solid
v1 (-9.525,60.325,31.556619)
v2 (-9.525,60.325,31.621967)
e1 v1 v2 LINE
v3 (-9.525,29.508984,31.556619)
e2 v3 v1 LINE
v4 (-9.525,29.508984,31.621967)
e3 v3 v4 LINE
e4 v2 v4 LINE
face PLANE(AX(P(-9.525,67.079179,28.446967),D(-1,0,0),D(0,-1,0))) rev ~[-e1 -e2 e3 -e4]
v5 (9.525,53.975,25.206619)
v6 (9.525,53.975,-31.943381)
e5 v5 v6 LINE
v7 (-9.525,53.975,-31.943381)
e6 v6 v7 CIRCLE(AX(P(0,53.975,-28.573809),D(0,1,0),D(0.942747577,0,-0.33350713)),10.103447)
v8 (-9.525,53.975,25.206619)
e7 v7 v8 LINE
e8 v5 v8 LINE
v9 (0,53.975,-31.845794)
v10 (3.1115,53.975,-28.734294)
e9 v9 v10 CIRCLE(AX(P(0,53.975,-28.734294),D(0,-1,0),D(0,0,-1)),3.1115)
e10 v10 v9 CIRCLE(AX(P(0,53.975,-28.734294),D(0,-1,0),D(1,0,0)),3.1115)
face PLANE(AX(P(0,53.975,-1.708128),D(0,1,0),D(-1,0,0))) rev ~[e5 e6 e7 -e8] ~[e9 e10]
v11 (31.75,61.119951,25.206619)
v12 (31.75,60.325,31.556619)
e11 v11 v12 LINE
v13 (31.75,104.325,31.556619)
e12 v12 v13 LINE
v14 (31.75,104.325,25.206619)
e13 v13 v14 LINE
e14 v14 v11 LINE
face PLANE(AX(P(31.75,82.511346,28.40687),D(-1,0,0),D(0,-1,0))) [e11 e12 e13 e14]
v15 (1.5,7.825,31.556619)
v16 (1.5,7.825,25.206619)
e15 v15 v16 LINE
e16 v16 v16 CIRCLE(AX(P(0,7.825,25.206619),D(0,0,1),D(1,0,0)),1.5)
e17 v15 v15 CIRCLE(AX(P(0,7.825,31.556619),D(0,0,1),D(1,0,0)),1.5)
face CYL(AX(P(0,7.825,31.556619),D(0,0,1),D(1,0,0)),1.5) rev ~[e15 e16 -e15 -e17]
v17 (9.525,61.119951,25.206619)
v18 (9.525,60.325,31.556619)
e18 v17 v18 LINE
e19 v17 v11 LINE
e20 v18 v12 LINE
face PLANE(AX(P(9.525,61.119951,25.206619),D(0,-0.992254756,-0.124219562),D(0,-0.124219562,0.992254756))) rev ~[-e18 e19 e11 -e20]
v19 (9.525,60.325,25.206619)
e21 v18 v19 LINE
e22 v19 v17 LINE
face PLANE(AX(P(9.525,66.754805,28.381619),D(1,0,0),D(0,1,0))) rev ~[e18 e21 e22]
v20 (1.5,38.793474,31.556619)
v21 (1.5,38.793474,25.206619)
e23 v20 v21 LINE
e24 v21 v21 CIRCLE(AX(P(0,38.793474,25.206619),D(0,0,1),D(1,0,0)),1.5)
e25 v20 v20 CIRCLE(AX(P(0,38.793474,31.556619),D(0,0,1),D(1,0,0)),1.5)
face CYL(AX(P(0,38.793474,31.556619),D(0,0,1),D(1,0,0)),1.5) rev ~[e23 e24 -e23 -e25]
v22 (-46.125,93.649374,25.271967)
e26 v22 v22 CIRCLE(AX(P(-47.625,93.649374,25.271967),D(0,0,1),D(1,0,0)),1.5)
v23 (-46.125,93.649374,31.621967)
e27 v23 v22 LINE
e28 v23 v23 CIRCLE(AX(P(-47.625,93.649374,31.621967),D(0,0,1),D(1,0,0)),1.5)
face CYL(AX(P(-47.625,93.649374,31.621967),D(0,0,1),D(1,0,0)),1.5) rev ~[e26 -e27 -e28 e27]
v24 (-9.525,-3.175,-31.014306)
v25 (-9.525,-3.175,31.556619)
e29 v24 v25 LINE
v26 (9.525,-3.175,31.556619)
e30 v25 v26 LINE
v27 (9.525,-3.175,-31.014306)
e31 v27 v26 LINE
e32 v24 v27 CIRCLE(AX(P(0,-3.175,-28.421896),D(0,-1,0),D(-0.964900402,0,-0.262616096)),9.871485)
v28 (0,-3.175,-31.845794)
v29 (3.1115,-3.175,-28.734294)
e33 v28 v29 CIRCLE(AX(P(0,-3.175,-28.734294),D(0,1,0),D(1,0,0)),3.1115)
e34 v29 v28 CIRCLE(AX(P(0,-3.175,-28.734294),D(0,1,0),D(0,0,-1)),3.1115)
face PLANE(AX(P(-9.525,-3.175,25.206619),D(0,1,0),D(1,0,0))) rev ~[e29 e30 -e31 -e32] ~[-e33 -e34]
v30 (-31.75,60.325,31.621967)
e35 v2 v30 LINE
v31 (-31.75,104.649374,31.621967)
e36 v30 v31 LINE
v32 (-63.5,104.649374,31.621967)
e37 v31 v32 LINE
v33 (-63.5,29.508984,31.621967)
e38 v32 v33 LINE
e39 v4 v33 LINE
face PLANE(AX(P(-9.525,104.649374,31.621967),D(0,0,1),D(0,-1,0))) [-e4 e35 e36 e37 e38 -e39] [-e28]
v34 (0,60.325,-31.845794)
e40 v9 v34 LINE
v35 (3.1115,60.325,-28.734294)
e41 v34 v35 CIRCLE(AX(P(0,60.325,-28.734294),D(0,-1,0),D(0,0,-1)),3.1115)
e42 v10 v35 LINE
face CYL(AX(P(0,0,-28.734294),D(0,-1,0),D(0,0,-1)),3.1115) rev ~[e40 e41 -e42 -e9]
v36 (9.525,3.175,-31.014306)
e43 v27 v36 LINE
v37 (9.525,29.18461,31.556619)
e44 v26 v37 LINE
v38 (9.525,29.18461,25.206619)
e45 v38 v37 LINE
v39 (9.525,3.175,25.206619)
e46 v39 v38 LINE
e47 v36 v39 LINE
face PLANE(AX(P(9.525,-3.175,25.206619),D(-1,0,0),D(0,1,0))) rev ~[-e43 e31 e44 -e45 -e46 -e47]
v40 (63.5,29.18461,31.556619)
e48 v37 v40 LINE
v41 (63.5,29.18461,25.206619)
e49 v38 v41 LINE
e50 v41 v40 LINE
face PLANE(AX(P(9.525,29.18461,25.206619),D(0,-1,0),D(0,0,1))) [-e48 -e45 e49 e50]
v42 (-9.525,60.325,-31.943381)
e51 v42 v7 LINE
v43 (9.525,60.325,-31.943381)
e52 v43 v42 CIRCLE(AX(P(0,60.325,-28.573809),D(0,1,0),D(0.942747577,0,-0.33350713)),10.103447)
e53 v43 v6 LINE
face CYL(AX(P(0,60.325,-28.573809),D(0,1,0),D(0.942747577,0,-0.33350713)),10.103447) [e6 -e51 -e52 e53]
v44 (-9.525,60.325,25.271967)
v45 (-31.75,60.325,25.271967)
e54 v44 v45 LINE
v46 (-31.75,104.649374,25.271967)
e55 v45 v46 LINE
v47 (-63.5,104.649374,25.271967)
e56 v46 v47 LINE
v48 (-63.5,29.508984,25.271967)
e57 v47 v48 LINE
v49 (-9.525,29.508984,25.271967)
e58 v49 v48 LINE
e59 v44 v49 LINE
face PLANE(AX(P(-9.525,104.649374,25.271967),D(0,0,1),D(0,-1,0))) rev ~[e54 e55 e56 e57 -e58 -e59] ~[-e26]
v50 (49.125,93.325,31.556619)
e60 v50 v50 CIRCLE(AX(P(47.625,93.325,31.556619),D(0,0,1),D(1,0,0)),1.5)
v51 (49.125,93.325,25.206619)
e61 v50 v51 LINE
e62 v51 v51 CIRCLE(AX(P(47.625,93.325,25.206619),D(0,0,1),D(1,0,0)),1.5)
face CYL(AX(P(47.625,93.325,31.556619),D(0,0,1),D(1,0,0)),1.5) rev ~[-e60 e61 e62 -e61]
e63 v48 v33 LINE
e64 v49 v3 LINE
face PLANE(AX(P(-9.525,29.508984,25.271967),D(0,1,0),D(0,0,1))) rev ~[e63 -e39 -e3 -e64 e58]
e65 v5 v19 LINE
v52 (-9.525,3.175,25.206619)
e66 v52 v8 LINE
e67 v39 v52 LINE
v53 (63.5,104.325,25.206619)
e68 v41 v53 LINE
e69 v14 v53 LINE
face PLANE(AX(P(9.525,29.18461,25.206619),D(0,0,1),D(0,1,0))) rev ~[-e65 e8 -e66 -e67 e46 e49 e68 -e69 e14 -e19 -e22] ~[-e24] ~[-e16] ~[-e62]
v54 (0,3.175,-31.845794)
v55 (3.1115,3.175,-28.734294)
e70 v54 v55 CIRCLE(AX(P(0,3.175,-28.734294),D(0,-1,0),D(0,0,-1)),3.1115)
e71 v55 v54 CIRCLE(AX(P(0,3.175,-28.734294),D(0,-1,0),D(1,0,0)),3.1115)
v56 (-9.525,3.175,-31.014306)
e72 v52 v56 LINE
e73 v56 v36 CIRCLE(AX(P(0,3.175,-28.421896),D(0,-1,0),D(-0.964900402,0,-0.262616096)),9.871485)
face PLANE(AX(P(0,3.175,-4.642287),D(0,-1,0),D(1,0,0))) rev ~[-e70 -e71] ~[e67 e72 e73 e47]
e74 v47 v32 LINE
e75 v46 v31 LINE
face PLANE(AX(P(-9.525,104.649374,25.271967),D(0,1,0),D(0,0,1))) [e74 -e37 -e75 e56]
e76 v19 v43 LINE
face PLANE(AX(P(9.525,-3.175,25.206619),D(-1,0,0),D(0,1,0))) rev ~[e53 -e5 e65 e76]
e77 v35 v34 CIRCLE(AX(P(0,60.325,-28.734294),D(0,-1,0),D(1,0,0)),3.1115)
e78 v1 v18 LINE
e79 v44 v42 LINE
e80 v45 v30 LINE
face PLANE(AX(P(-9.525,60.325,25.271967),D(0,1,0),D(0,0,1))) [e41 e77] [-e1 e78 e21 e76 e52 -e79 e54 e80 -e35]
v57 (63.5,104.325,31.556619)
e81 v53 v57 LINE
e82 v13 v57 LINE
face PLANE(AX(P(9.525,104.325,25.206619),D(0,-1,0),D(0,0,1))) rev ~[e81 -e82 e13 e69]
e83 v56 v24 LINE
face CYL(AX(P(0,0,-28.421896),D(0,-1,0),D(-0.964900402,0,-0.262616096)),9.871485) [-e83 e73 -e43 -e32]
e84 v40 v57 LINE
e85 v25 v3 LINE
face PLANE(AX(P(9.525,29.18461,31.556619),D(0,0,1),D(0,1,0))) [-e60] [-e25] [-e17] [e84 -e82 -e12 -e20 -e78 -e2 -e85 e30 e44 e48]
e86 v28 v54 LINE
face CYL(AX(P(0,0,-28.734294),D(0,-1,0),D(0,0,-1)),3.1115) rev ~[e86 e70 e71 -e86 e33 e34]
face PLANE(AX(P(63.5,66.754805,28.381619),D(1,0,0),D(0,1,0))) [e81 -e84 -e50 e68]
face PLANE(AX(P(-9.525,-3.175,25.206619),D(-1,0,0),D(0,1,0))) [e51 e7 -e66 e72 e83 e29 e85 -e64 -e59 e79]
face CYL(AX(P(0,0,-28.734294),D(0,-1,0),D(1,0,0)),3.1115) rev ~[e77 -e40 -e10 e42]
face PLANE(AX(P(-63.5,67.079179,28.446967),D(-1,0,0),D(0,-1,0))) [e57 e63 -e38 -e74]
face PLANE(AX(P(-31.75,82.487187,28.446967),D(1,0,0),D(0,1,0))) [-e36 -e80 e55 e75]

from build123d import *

# Parameters (mm, degrees)
F1_DEPTH  = 3.175
F2_DEPTH  = 3.175
F4_DEPTH  = 25.4
F5_DEPTH  = 25.4
F6_W      = 19.05
F6_H      = 63.5
F7_DEPTH  = 6.35
F9_DEPTH  = 6.35
F10_DEPTH = 2540
F11_R     = 1.5
F12_DEPTH = 25.4
F13_W     = 75.1403903484
F13_H     = 6.35
F14_DEPTH = 53.975
F15_R     = 1.5
F16_DEPTH = 25
F17_W     = 75.1403903484
F17_H     = 6.35
F18_DEPTH = 53.975
F19_R     = 1.5
F20_DEPTH = 25
F22_DEPTH = 22.225
F23_W     = 44.3243741632
F23_H     = 6.35
F24_DEPTH = 22.225


# Not quite as in the source:
# - a length typed as a fraction of an inch, garbled in the dataset ("3 / 203.2 mm" for 3/8 in), is restored


with BuildPart() as f1:
    # F0 (on Front) → F1 (new body)
    with BuildSketch(Plane.XZ):
        with BuildLine():
            Line((9.525, 25.206619263), (-9.525, 25.206619263))
            Line((-9.525, 25.206619263), (-9.525, -31.0143064708))
            ThreePointArc((-9.525, -31.0143064708), (0, -38.293380737), (9.525, -31.0143064708))
            Line((9.525, -31.0143064708), (9.525, 25.206619263))
        make_face()
    extrude(amount=F1_DEPTH)

    # F0 (on Front) → F2 (join)
    with BuildSketch(Plane.XZ):
        with BuildLine():
            Line((9.525, 25.206619263), (-9.525, 25.206619263))
            Line((-9.525, 25.206619263), (-9.525, -31.0143064708))
            ThreePointArc((-9.525, -31.0143064708), (0, -38.293380737), (9.525, -31.0143064708))
            Line((9.525, -31.0143064708), (9.525, 25.206619263))
        make_face()
    extrude(amount=-F2_DEPTH)

    # F3 (on Front) → F4 (cut)
    with BuildSketch(Plane.XZ):
        with BuildLine():
            ThreePointArc((0, -31.845793884), (2.2001627497, -30.9344566337), (3.1115, -28.734293884))
            ThreePointArc((3.1115, -28.734293884), (-2.2001627497, -26.5341311344), (0, -31.845793884))
        make_face()
    extrude(amount=-F4_DEPTH, mode=Mode.SUBTRACT)

    # F3 (on Front) → F5 (cut)
    with BuildSketch(Plane.XZ):
        with BuildLine():
            ThreePointArc((0, -31.845793884), (2.2001627497, -30.9344566337), (3.1115, -28.734293884))
            ThreePointArc((3.1115, -28.734293884), (-2.2001627497, -26.5341311344), (0, -31.845793884))
        make_face()
    extrude(amount=F5_DEPTH, mode=Mode.SUBTRACT)

    # F6 (on face) → F7 (join)
    with BuildSketch(Plane.XY.offset(25.206619263)):
        with Locations((0, 28.575)):
            Rectangle(F6_W, F6_H)
    extrude(amount=F7_DEPTH)

    # F11 (on face) → F12 (cut)
    with BuildSketch(Plane.XY.offset(31.556619263)):
        with Locations((0, 7.825)):
            Circle(F11_R)
        with Locations((0, 38.7934744358)):
            Circle(F11_R)
    extrude(amount=-F12_DEPTH, mode=Mode.SUBTRACT)



with BuildPart() as f9:
    # F8 (on face) → F9 (new body)
    with BuildSketch(Plane(origin=(0, 60.325, 0), x_dir=(-1, 0, 0), z_dir=(0, 1, 0))):
        with BuildLine():
            Line((-9.525, 31.556619263), (-9.525, -31.943380737))
            ThreePointArc((-9.525, -31.943380737), (0, -38.6772559995), (9.525, -31.943380737))
            Line((9.525, -31.943380737), (9.525, 31.556619263))
            Line((9.525, 31.556619263), (-9.525, 31.556619263))
        make_face()
    extrude(amount=-F9_DEPTH)

    # F3 (on Front) → F10 (cut)
    with BuildSketch(Plane.XZ):
        with BuildLine():
            ThreePointArc((0, -31.845793884), (2.2001627497, -30.9344566337), (3.1115, -28.734293884))
            ThreePointArc((3.1115, -28.734293884), (-2.2001627497, -26.5341311344), (0, -31.845793884))
        make_face()
    extrude(amount=-F10_DEPTH, mode=Mode.SUBTRACT)


with BuildPart() as f1_1:
    add(f1.part)

    add(f9.part)  # F14 merges F9
    # F13 (on face) → F14 (join)
    with BuildSketch(Plane.YZ.offset(9.525)):
        with Locations((66.7548048258, 28.381619263)):
            Rectangle(F13_W, F13_H)
    extrude(amount=F14_DEPTH)

    # F15 (on face) → F16 (cut)
    with BuildSketch(Plane.XY.offset(31.556619263)):
        with Locations((47.625, 93.325)):
            Circle(F15_R)
    extrude(amount=-F16_DEPTH, mode=Mode.SUBTRACT)

    # F17 (on face) → F18 (join)
    with BuildSketch(Plane(origin=(-9.525, 0, 0), x_dir=(0, -1, 0), z_dir=(-1, 0, 0))):
        with Locations((-67.0791789889, 28.4469667822)):
            Rectangle(F17_W, F17_H)
    extrude(amount=F18_DEPTH)

    # F19 (on face) → F20 (cut)
    with BuildSketch(Plane.XY.offset(31.6219667822)):
        with Locations((-47.625, 93.6493741632)):
            Circle(F19_R)
    extrude(amount=-F20_DEPTH, mode=Mode.SUBTRACT)

    # F21 (on face) → F22 (cut)
    with BuildSketch(Plane(origin=(9.525, 0, 0), x_dir=(0, -1, 0), z_dir=(-1, 0, 0))):
        Polygon((-104.325, 31.556619263), (-104.325, 25.206619263), (-61.1199513078, 25.206619263), (-60.325, 31.556619263), align=None)
    extrude(amount=-F22_DEPTH, mode=Mode.SUBTRACT)

    # F23 (on face) → F24 (cut)
    with BuildSketch(Plane.YZ.offset(-9.525)):
        with Locations((82.4871870816, 28.4469667822)):
            Rectangle(F23_W, F23_H)
    extrude(amount=-F24_DEPTH, mode=Mode.SUBTRACT)


solid = f1_1.part
